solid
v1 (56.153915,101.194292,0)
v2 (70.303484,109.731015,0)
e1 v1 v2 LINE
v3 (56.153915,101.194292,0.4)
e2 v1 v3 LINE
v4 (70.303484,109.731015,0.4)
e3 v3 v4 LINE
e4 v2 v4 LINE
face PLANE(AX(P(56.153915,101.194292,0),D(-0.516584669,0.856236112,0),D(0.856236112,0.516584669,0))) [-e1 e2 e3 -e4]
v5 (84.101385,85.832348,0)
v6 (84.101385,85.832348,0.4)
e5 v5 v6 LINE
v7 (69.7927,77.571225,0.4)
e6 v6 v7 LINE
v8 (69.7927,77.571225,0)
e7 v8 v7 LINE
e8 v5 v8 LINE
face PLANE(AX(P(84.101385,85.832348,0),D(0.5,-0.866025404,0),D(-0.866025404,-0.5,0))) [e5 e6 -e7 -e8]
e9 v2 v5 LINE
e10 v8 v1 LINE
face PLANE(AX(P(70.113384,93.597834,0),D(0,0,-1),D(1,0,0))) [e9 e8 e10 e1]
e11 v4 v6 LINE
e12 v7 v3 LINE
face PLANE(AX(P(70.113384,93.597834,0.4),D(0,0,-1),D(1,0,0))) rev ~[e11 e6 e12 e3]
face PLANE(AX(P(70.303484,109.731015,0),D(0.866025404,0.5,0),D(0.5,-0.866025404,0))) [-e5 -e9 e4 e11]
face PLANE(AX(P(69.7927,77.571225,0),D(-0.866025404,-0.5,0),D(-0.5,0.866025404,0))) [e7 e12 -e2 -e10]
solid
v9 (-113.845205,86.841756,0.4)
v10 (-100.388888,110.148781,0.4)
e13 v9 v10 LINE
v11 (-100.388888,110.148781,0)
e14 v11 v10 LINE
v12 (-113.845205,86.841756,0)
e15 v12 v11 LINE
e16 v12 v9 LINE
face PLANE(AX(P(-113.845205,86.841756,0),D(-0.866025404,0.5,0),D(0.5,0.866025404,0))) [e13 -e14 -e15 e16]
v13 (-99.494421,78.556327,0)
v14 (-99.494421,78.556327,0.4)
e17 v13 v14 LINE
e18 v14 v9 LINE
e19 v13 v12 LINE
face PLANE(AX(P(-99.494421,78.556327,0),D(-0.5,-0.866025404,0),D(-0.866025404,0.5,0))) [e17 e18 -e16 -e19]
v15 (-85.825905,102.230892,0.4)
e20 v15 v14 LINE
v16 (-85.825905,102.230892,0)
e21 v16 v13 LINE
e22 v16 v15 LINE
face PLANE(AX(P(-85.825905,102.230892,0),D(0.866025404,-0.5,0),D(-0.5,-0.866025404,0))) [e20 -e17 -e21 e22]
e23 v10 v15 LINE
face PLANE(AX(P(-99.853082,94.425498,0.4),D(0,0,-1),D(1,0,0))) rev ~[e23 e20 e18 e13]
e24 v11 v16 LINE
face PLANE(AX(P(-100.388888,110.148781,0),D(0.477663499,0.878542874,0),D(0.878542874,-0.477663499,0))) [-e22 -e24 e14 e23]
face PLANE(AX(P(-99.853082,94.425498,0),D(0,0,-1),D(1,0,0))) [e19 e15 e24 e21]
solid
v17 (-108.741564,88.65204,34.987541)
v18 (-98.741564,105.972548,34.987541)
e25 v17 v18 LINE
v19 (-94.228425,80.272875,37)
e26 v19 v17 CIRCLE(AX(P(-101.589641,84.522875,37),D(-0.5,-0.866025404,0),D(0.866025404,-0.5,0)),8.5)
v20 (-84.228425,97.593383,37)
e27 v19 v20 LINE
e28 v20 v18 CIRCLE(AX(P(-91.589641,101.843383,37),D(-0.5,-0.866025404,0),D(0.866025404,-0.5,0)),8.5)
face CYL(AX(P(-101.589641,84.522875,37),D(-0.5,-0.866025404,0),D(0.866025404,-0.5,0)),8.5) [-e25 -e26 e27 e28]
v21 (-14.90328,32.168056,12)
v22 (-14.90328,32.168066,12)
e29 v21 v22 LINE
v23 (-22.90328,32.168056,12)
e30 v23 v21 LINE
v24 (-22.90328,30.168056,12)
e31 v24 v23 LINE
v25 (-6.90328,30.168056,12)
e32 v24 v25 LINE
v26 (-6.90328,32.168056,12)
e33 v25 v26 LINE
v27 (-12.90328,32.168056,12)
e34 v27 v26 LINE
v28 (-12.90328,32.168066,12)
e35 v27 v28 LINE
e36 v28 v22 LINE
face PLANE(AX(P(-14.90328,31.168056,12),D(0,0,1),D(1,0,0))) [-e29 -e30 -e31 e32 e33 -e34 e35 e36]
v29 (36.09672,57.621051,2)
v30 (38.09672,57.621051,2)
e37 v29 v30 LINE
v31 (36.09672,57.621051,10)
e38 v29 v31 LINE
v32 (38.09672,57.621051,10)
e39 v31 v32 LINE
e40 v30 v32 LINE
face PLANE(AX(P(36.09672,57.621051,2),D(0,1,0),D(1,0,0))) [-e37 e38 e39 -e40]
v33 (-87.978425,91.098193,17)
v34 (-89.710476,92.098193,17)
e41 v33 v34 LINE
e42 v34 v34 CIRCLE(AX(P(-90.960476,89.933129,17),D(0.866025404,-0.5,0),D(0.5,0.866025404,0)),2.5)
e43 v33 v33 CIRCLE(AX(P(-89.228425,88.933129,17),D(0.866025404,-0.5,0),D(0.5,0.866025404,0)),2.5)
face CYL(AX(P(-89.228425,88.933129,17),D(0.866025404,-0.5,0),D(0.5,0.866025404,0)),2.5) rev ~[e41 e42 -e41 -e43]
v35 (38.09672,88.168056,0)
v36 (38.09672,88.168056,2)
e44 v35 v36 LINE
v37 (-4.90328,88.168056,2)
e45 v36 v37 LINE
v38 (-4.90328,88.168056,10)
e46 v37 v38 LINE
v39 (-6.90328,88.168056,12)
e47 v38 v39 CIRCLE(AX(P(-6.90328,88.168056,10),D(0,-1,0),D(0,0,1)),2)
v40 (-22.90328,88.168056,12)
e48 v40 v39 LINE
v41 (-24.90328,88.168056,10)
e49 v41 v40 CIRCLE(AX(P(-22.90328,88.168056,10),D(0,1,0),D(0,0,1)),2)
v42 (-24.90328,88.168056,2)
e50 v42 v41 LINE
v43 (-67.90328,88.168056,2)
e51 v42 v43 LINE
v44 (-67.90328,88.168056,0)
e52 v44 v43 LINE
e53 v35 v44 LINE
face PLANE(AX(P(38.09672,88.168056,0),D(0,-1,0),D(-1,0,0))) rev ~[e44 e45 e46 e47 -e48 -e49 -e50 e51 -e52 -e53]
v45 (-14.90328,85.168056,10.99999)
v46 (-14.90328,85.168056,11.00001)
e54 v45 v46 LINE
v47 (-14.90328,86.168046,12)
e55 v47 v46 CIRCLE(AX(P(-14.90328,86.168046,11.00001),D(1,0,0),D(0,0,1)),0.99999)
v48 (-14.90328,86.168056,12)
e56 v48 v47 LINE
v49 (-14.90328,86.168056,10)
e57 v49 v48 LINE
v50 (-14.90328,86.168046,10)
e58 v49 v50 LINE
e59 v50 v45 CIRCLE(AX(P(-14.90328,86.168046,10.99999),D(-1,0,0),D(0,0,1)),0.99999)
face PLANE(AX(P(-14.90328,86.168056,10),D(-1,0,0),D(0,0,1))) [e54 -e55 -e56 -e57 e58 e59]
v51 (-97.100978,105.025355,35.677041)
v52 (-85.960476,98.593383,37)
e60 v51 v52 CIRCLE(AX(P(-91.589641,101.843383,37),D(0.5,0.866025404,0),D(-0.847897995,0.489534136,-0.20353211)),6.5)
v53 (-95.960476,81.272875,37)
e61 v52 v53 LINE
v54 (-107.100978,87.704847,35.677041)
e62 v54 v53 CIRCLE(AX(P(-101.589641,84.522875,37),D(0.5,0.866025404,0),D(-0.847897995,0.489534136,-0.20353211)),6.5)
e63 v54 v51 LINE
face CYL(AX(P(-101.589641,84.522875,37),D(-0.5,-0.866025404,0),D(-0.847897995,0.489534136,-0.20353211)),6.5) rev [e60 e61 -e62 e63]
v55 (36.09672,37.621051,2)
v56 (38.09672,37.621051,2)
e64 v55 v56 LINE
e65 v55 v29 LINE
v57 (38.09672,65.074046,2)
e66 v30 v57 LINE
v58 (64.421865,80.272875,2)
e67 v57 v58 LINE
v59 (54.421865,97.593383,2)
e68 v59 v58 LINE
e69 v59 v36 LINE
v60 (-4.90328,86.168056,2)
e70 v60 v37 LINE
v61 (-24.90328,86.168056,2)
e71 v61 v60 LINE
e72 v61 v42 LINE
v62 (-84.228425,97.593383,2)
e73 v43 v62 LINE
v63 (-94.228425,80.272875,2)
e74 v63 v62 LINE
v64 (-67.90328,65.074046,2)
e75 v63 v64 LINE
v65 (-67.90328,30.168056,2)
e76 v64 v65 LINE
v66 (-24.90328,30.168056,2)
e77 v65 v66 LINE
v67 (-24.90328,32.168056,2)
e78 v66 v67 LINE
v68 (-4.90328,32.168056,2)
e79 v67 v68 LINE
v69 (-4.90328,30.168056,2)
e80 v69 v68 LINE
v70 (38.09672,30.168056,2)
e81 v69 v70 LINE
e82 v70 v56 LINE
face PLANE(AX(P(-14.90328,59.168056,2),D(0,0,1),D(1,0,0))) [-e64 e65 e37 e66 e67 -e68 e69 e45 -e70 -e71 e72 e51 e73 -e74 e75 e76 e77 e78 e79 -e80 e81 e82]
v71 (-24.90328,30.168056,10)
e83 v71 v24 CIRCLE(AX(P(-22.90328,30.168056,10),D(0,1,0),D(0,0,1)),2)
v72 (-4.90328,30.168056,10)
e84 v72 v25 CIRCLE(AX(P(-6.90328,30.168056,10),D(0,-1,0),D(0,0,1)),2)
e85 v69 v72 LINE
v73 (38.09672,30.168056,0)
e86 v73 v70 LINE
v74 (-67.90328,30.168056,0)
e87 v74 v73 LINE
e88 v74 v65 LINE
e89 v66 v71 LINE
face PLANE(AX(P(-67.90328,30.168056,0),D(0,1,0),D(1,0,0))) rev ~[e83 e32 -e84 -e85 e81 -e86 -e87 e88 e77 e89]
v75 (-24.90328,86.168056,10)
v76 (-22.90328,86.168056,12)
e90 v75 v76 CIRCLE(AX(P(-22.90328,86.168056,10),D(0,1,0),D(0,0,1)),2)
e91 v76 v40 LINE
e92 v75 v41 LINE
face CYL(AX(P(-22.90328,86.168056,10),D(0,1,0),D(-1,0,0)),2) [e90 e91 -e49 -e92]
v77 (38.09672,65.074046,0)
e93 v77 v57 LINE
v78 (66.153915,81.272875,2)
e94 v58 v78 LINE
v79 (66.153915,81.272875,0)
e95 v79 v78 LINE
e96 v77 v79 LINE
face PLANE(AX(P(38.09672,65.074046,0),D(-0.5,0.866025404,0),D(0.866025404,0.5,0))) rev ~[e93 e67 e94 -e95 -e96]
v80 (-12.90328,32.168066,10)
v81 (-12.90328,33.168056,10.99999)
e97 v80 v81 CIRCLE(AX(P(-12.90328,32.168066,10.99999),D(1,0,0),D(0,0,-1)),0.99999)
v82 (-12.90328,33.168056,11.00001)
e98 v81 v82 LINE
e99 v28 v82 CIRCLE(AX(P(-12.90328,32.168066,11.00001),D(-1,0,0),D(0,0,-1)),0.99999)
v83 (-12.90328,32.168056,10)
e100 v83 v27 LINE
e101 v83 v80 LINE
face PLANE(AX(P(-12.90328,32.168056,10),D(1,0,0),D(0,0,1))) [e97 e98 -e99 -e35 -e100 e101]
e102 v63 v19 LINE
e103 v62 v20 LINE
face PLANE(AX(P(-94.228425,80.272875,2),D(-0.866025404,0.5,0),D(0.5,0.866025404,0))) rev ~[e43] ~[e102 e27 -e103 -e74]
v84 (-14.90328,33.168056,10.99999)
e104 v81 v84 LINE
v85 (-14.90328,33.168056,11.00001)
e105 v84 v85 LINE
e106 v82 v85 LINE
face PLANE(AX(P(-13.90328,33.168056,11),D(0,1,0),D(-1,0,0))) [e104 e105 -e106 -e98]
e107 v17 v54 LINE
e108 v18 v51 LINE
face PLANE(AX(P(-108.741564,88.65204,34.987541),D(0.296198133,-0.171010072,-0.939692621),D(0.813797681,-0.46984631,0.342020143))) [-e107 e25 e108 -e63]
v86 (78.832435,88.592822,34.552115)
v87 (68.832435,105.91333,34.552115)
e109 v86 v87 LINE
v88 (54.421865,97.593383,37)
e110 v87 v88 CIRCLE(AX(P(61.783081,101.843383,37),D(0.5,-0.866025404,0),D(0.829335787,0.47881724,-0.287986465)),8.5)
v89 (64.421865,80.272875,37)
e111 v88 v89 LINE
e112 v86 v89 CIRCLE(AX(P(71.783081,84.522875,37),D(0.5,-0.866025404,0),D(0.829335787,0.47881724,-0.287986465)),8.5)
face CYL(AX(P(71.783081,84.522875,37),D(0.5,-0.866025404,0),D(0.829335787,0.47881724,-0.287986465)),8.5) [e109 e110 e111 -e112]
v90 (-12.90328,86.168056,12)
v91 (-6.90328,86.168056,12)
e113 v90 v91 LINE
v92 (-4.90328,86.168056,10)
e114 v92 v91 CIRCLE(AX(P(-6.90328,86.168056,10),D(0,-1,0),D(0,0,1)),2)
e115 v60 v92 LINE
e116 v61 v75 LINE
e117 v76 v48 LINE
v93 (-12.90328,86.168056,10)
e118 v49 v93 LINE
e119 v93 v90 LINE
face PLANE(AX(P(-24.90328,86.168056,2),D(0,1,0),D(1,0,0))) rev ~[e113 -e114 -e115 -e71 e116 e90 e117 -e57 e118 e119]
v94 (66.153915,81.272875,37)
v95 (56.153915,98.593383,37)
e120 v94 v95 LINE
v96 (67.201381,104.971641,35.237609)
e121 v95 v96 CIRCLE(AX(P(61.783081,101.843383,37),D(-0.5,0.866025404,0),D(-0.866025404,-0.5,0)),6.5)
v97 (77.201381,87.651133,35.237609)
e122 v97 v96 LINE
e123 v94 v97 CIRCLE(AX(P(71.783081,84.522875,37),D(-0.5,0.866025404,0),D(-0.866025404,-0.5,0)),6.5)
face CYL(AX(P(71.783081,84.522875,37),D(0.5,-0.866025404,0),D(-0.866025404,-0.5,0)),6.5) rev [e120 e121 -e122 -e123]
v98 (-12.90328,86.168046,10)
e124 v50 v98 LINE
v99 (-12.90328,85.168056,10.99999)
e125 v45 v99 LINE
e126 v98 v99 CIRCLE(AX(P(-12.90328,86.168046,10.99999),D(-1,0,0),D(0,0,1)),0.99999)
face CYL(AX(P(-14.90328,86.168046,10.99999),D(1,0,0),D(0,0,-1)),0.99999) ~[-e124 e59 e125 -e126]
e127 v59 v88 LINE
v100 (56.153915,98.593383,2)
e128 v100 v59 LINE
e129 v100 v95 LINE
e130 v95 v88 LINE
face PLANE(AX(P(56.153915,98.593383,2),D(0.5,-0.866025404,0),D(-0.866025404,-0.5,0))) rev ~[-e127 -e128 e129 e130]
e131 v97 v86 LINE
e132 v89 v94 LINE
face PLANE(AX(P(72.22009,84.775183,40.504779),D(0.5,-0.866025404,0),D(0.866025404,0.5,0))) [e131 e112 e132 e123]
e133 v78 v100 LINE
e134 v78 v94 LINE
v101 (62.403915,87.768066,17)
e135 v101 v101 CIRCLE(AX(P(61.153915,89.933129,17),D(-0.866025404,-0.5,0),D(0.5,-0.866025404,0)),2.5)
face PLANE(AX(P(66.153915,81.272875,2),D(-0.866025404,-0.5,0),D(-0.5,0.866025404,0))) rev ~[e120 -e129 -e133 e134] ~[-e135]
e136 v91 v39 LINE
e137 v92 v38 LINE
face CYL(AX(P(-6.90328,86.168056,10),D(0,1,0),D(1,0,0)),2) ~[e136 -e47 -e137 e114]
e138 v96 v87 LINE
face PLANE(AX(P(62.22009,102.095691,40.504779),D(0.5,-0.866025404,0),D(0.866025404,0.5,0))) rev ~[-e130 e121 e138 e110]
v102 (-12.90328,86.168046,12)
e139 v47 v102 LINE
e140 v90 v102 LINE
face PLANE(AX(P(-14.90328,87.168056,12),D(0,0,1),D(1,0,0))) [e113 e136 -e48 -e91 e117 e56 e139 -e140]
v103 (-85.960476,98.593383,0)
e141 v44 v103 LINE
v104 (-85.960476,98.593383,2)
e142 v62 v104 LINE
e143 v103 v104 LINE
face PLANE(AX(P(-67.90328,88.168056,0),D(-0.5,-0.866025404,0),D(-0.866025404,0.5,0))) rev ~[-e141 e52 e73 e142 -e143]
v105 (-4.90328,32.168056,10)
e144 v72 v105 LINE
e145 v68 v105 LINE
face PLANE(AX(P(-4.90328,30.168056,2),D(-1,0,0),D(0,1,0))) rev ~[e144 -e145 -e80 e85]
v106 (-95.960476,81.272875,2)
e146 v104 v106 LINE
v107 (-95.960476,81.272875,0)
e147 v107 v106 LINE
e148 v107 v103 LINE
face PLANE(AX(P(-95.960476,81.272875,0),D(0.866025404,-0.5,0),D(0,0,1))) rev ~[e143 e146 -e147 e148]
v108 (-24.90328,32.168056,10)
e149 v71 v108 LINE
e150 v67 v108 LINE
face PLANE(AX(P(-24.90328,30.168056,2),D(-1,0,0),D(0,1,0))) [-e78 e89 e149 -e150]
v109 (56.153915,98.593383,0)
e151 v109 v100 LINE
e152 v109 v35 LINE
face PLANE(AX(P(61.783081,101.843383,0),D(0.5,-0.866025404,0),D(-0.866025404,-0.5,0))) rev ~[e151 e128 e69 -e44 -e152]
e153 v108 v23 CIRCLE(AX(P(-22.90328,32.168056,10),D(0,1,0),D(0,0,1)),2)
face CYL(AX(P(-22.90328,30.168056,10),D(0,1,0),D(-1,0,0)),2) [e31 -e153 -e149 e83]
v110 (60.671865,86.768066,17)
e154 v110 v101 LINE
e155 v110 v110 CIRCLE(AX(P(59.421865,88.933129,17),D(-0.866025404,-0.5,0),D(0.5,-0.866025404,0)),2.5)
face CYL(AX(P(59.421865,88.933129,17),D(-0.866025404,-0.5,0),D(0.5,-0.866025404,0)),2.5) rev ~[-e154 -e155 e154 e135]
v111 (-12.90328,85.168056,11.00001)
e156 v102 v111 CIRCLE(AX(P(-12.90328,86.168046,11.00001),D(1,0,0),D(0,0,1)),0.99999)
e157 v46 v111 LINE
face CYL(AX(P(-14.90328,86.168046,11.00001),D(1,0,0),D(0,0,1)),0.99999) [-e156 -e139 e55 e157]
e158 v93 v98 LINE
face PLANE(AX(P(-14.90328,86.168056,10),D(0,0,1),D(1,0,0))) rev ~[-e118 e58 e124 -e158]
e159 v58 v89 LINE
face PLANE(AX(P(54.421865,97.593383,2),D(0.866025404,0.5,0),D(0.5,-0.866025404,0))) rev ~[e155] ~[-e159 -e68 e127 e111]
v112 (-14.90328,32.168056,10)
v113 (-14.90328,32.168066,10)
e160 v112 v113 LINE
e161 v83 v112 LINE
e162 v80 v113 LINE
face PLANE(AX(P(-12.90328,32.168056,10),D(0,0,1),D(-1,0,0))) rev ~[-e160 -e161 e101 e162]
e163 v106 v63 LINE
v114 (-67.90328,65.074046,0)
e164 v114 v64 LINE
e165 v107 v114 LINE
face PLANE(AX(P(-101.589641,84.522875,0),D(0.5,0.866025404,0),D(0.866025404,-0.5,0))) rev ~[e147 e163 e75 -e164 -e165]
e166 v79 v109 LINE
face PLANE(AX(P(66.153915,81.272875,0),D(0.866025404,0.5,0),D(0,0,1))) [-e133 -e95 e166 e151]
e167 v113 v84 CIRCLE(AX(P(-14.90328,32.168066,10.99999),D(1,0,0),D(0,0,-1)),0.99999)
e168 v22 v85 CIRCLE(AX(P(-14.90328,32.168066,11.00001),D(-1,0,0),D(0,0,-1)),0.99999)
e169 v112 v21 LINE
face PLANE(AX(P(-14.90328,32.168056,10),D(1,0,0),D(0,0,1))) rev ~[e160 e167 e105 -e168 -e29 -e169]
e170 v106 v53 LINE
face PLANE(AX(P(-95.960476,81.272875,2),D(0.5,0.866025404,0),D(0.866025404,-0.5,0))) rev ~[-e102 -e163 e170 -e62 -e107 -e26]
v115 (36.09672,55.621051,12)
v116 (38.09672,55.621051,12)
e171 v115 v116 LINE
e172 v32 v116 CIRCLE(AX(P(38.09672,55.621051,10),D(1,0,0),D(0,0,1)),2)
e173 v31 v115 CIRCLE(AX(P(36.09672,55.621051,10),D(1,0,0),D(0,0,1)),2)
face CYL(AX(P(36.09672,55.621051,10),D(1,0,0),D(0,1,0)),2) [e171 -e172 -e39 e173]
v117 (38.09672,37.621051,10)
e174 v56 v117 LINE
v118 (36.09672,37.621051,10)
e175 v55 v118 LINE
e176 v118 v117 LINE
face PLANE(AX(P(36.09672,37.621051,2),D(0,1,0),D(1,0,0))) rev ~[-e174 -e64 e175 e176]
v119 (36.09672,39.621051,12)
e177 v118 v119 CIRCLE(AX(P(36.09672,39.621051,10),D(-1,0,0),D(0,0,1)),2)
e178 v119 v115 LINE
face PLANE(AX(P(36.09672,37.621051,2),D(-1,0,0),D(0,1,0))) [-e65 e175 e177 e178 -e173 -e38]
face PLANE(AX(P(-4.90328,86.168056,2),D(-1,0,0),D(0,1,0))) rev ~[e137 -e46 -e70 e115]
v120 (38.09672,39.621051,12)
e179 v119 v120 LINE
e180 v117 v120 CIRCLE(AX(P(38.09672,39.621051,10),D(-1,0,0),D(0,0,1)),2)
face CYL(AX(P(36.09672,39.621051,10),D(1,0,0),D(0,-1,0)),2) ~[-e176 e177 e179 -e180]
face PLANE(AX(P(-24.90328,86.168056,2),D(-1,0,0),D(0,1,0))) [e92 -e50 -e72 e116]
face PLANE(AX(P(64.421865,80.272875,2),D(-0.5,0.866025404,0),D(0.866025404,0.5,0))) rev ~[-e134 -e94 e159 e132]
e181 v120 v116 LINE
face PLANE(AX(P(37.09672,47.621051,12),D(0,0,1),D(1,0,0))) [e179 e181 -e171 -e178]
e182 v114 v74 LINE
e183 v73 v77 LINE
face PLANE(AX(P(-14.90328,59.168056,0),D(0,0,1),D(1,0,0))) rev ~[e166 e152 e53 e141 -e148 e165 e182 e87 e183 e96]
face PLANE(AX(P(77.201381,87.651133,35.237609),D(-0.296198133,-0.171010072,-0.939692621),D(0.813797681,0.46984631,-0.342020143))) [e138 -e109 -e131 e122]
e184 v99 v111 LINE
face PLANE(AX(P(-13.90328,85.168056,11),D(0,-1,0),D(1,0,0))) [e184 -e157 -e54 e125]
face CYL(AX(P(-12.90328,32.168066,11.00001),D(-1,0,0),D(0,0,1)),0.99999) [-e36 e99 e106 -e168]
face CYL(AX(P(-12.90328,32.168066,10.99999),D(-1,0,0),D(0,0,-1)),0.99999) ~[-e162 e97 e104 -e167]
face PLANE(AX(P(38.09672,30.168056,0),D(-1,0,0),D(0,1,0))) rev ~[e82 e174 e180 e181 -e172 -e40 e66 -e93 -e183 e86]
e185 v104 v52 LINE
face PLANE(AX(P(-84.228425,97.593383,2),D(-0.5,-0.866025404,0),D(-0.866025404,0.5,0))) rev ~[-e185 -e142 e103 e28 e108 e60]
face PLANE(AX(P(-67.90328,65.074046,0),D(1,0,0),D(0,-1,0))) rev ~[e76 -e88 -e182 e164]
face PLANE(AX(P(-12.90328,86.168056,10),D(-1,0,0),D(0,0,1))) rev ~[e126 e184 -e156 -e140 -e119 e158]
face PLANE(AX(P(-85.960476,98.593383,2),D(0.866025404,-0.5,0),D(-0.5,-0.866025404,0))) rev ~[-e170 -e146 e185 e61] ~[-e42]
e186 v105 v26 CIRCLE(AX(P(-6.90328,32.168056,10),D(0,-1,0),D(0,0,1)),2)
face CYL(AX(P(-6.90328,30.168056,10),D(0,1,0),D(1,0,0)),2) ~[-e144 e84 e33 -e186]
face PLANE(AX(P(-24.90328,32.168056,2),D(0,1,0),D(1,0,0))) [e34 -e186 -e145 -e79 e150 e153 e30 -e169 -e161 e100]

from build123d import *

# Parameters (mm, degrees)
F1_DEPTH  = 2
F3_DEPTH  = 35
F5_DEPTH  = 20
F6_W      = 6.5
F6_H      = 2
F7_DEPTH  = 20
F9_DEPTH  = 20
F10_W     = 6.5
F10_H     = 2
F11_DEPTH = 20
F12_R     = 2.5
F13_DEPTH = 2
F14_R     = 2.5
F15_DEPTH = 2
F16_W     = 20
F16_H     = 2
F16_W_2   = 2
F16_H_2   = 20
F17_DEPTH = 10
F18_R     = 2
F19_W     = 2
F19_H     = 2
F20_DEPTH = 1
F21_R     = 0.99999
F22_W     = 2
F22_H     = 2
F23_DEPTH = 1
F24_R     = 0.99999
F26_DEPTH = 0.4


# Not quite as in the source:
# - a fillet or chamfer is up to 0.001 mm smaller than in the source, because OpenCascade refuses the exact size


with BuildPart() as f1:
    # F0 (on Top) → F1 (new body)
    with BuildSketch(Plane.XY):
        Polygon((-67.9032802582, 30.168056488), (38.0967197418, 30.168056488), (38.0967197418, 65.0740457205), (38.0967197418, 88.168056488), (-67.9032802582, 88.168056488), (-67.9032802582, 65.0740457205), align=None)
        Polygon((-101.5896410854, 84.5228752121), (-67.9032802582, 65.0740457205), (-67.9032802582, 88.168056488), (-91.5896410854, 101.8433832877), align=None)
        Polygon((38.0967197418, 88.168056488), (38.0967197418, 65.0740457205), (71.783080569, 84.5228752121), (61.783080569, 101.8433832877), align=None)
    extrude(amount=F1_DEPTH)

    # F2 (on face) → F3 (join)
    with BuildSketch(Plane.XY.offset(2)):
        Polygon((-84.2284251532, 97.5933832877), (-85.9604759608, 98.5933832877), (-95.9604759608, 81.2728752121), (-94.2284251532, 80.2728752121), align=None)
        Polygon((56.1539154444, 98.5933832877), (54.4218646369, 97.5933832877), (64.4218646369, 80.2728752121), (66.1539154444, 81.2728752121), align=None)
    extrude(amount=F3_DEPTH)

    # F4 (on face) → F5 (join)
    with BuildSketch(Plane(origin=(-18.653708425, 32.3091707417, 0), x_dir=(0.8660254038, 0.5, 0), z_dir=(0.5, -0.8660254038, 0))):
        with BuildLine():
            ThreePointArc((97.9274089407, 37), (105.3169745916, 43.4388409635), (110.6839236954, 35.2376086915))
            Line((110.6839236954, 35.2376086915), (112.5673020138, 34.5521150438))
            ThreePointArc((112.5673020138, 34.5521150438), (105.664524311, 45.4094913973), (95.9274089407, 37))
            Line((95.9274089407, 37), (97.9274089407, 37))
        make_face()
    extrude(amount=-F5_DEPTH)

    # F6 (on face) → F7 (cut)
    with BuildSketch(Plane(origin=(-18.653708425, 32.3091707417, 0), x_dir=(0.8660254038, 0.5, 0), z_dir=(0.5, -0.8660254038, 0))):
        with Locations((101.1774089407, 1)):
            Rectangle(F6_W, F6_H)
    extrude(amount=-F7_DEPTH, mode=Mode.SUBTRACT)

    # F8 (on face) → F9 (join)
    with BuildSketch(Plane(origin=(11.2020682959, 19.4025514384, 0), x_dir=(0.8660254038, -0.5, 0), z_dir=(-0.5, -0.8660254038, 0))):
        Polygon((-121.7406475473, 2), (-121.7406475473, 37), (-123.7406475473, 37), (-123.7406475473, 2), (-130.2406475473, 2), (-130.2406475473, 0), (-91.3429885641, 0), (-91.3429885641, 2), align=None)
        with BuildLine():
            Line((-123.7406475473, 37), (-121.7406475473, 37))
            ThreePointArc((-121.7406475473, 37), (-131.2541063524, 45.439366164), (-138.4989772533, 34.9875411887))
            Line((-138.4989772533, 34.9875411887), (-136.6045913116, 35.6770412837))
            ThreePointArc((-136.6045913116, 35.6770412837), (-130.9056157917, 43.4658964757), (-123.7406475473, 37))
        make_face()
    extrude(amount=-F9_DEPTH)

    # F10 (on face) → F11 (cut)
    with BuildSketch(Plane(origin=(11.2020682959, 19.4025514384, 0), x_dir=(0.8660254038, -0.5, 0), z_dir=(-0.5, -0.8660254038, 0))):
        with Locations((-126.9906475473, 1)):
            Rectangle(F10_W, F10_H)
    extrude(amount=-F11_DEPTH, mode=Mode.SUBTRACT)

    # F12 (on face) → F13 (cut)
    with BuildSketch(Plane(origin=(-105.4304934491, 60.8703237737, 0), x_dir=(0.5, 0.8660254038, 0), z_dir=(0.8660254038, -0.5, 0))):
        with Locations((32.4041365919, 17)):
            Circle(F12_R)
    extrude(amount=-F13_DEPTH, mode=Mode.SUBTRACT)

    # F14 (on face) → F15 (cut)
    with BuildSketch(Plane(origin=(83.0755730619, 47.9637044704, 0), x_dir=(0.5, -0.8660254038, 0), z_dir=(-0.8660254038, -0.5, 0))):
        with Locations((-47.30741685, 17)):
            Circle(F14_R)
    extrude(amount=-F15_DEPTH, mode=Mode.SUBTRACT)

    # F16 (on face) → F17 (join)
    with BuildSketch(Plane.XY.offset(2)):
        with Locations((-14.9032802582, 87.168056488)):
            Rectangle(F16_W, F16_H)
        with Locations((-14.9032802582, 31.168056488)):
            Rectangle(F16_W, F16_H)
        with Locations((37.0967197418, 47.6210511042)):
            Rectangle(F16_W_2, F16_H_2)
    extrude(amount=F17_DEPTH)

    # F18
    f18_edges = [f1.edges().sort_by_distance(p)[0] for p in [
        (-24.90328, 87.168056, 12),
        (-4.90328, 87.168056, 12),
        (-24.90328, 31.168056, 12),
        (-4.90328, 31.168056, 12),
        (37.09672, 37.621051, 12),
        (37.09672, 57.621051, 12),
    ]]
    fillet(f18_edges, radius=F18_R)

    # F19 (on face) → F20 (join)
    with BuildSketch(Plane.XZ.offset(-86.168056488)):
        with Locations((-13.9032802582, 11)):
            Rectangle(F19_W, F19_H)
    extrude(amount=F20_DEPTH)

    # F21 (radius 1 in the source; OpenCascade refuses exactly that, so slightly less here)
    f21_edges = [f1.edges().sort_by_distance(p)[0] for p in [
        (-13.90328, 85.168056, 10),
        (-13.90328, 85.168056, 12),
    ]]
    fillet(f21_edges, radius=F21_R)

    # F22 (on face) → F23 (join)
    with BuildSketch(Plane(origin=(0, 32.168056488, 0), x_dir=(-1, 0, 0), z_dir=(0, 1, 0))):
        with Locations((13.9032802582, 11)):
            Rectangle(F22_W, F22_H)
    extrude(amount=F23_DEPTH)

    # F24 (radius 1 in the source; OpenCascade refuses exactly that, so slightly less here)
    f24_edges = [f1.edges().sort_by_distance(p)[0] for p in [
        (-13.90328, 33.168056, 10),
        (-13.90328, 33.168056, 12),
    ]]
    fillet(f24_edges, radius=F24_R)


with BuildPart() as f26:
    # F25 (on face) → F26 (new body)
    with BuildSketch(Plane(origin=(0, 0, 0), x_dir=(1, 0, 0), z_dir=(0, 0, -1))):
        Polygon((69.792699928, -77.5712246278), (56.1539154444, -101.1942923069), (70.3034838034, -109.7310148019), (84.1013854701, -85.8323480773), align=None)
    extrude(amount=-F26_DEPTH)


with BuildPart() as f26b:
    # F25 (on face) → F26, piece 2 (new body)
    with BuildSketch(Plane(origin=(0, 0, 0), x_dir=(1, 0, 0), z_dir=(0, 0, -1))):
        Polygon((-100.3888883417, -110.1487811715), (-85.8259052038, -102.2308915854), (-99.4944213659, -78.5563271285), (-113.8452054823, -86.8417562012), align=None)
    extrude(amount=-F26_DEPTH)


solid = Compound([f1.part, f26.part, f26b.part])
